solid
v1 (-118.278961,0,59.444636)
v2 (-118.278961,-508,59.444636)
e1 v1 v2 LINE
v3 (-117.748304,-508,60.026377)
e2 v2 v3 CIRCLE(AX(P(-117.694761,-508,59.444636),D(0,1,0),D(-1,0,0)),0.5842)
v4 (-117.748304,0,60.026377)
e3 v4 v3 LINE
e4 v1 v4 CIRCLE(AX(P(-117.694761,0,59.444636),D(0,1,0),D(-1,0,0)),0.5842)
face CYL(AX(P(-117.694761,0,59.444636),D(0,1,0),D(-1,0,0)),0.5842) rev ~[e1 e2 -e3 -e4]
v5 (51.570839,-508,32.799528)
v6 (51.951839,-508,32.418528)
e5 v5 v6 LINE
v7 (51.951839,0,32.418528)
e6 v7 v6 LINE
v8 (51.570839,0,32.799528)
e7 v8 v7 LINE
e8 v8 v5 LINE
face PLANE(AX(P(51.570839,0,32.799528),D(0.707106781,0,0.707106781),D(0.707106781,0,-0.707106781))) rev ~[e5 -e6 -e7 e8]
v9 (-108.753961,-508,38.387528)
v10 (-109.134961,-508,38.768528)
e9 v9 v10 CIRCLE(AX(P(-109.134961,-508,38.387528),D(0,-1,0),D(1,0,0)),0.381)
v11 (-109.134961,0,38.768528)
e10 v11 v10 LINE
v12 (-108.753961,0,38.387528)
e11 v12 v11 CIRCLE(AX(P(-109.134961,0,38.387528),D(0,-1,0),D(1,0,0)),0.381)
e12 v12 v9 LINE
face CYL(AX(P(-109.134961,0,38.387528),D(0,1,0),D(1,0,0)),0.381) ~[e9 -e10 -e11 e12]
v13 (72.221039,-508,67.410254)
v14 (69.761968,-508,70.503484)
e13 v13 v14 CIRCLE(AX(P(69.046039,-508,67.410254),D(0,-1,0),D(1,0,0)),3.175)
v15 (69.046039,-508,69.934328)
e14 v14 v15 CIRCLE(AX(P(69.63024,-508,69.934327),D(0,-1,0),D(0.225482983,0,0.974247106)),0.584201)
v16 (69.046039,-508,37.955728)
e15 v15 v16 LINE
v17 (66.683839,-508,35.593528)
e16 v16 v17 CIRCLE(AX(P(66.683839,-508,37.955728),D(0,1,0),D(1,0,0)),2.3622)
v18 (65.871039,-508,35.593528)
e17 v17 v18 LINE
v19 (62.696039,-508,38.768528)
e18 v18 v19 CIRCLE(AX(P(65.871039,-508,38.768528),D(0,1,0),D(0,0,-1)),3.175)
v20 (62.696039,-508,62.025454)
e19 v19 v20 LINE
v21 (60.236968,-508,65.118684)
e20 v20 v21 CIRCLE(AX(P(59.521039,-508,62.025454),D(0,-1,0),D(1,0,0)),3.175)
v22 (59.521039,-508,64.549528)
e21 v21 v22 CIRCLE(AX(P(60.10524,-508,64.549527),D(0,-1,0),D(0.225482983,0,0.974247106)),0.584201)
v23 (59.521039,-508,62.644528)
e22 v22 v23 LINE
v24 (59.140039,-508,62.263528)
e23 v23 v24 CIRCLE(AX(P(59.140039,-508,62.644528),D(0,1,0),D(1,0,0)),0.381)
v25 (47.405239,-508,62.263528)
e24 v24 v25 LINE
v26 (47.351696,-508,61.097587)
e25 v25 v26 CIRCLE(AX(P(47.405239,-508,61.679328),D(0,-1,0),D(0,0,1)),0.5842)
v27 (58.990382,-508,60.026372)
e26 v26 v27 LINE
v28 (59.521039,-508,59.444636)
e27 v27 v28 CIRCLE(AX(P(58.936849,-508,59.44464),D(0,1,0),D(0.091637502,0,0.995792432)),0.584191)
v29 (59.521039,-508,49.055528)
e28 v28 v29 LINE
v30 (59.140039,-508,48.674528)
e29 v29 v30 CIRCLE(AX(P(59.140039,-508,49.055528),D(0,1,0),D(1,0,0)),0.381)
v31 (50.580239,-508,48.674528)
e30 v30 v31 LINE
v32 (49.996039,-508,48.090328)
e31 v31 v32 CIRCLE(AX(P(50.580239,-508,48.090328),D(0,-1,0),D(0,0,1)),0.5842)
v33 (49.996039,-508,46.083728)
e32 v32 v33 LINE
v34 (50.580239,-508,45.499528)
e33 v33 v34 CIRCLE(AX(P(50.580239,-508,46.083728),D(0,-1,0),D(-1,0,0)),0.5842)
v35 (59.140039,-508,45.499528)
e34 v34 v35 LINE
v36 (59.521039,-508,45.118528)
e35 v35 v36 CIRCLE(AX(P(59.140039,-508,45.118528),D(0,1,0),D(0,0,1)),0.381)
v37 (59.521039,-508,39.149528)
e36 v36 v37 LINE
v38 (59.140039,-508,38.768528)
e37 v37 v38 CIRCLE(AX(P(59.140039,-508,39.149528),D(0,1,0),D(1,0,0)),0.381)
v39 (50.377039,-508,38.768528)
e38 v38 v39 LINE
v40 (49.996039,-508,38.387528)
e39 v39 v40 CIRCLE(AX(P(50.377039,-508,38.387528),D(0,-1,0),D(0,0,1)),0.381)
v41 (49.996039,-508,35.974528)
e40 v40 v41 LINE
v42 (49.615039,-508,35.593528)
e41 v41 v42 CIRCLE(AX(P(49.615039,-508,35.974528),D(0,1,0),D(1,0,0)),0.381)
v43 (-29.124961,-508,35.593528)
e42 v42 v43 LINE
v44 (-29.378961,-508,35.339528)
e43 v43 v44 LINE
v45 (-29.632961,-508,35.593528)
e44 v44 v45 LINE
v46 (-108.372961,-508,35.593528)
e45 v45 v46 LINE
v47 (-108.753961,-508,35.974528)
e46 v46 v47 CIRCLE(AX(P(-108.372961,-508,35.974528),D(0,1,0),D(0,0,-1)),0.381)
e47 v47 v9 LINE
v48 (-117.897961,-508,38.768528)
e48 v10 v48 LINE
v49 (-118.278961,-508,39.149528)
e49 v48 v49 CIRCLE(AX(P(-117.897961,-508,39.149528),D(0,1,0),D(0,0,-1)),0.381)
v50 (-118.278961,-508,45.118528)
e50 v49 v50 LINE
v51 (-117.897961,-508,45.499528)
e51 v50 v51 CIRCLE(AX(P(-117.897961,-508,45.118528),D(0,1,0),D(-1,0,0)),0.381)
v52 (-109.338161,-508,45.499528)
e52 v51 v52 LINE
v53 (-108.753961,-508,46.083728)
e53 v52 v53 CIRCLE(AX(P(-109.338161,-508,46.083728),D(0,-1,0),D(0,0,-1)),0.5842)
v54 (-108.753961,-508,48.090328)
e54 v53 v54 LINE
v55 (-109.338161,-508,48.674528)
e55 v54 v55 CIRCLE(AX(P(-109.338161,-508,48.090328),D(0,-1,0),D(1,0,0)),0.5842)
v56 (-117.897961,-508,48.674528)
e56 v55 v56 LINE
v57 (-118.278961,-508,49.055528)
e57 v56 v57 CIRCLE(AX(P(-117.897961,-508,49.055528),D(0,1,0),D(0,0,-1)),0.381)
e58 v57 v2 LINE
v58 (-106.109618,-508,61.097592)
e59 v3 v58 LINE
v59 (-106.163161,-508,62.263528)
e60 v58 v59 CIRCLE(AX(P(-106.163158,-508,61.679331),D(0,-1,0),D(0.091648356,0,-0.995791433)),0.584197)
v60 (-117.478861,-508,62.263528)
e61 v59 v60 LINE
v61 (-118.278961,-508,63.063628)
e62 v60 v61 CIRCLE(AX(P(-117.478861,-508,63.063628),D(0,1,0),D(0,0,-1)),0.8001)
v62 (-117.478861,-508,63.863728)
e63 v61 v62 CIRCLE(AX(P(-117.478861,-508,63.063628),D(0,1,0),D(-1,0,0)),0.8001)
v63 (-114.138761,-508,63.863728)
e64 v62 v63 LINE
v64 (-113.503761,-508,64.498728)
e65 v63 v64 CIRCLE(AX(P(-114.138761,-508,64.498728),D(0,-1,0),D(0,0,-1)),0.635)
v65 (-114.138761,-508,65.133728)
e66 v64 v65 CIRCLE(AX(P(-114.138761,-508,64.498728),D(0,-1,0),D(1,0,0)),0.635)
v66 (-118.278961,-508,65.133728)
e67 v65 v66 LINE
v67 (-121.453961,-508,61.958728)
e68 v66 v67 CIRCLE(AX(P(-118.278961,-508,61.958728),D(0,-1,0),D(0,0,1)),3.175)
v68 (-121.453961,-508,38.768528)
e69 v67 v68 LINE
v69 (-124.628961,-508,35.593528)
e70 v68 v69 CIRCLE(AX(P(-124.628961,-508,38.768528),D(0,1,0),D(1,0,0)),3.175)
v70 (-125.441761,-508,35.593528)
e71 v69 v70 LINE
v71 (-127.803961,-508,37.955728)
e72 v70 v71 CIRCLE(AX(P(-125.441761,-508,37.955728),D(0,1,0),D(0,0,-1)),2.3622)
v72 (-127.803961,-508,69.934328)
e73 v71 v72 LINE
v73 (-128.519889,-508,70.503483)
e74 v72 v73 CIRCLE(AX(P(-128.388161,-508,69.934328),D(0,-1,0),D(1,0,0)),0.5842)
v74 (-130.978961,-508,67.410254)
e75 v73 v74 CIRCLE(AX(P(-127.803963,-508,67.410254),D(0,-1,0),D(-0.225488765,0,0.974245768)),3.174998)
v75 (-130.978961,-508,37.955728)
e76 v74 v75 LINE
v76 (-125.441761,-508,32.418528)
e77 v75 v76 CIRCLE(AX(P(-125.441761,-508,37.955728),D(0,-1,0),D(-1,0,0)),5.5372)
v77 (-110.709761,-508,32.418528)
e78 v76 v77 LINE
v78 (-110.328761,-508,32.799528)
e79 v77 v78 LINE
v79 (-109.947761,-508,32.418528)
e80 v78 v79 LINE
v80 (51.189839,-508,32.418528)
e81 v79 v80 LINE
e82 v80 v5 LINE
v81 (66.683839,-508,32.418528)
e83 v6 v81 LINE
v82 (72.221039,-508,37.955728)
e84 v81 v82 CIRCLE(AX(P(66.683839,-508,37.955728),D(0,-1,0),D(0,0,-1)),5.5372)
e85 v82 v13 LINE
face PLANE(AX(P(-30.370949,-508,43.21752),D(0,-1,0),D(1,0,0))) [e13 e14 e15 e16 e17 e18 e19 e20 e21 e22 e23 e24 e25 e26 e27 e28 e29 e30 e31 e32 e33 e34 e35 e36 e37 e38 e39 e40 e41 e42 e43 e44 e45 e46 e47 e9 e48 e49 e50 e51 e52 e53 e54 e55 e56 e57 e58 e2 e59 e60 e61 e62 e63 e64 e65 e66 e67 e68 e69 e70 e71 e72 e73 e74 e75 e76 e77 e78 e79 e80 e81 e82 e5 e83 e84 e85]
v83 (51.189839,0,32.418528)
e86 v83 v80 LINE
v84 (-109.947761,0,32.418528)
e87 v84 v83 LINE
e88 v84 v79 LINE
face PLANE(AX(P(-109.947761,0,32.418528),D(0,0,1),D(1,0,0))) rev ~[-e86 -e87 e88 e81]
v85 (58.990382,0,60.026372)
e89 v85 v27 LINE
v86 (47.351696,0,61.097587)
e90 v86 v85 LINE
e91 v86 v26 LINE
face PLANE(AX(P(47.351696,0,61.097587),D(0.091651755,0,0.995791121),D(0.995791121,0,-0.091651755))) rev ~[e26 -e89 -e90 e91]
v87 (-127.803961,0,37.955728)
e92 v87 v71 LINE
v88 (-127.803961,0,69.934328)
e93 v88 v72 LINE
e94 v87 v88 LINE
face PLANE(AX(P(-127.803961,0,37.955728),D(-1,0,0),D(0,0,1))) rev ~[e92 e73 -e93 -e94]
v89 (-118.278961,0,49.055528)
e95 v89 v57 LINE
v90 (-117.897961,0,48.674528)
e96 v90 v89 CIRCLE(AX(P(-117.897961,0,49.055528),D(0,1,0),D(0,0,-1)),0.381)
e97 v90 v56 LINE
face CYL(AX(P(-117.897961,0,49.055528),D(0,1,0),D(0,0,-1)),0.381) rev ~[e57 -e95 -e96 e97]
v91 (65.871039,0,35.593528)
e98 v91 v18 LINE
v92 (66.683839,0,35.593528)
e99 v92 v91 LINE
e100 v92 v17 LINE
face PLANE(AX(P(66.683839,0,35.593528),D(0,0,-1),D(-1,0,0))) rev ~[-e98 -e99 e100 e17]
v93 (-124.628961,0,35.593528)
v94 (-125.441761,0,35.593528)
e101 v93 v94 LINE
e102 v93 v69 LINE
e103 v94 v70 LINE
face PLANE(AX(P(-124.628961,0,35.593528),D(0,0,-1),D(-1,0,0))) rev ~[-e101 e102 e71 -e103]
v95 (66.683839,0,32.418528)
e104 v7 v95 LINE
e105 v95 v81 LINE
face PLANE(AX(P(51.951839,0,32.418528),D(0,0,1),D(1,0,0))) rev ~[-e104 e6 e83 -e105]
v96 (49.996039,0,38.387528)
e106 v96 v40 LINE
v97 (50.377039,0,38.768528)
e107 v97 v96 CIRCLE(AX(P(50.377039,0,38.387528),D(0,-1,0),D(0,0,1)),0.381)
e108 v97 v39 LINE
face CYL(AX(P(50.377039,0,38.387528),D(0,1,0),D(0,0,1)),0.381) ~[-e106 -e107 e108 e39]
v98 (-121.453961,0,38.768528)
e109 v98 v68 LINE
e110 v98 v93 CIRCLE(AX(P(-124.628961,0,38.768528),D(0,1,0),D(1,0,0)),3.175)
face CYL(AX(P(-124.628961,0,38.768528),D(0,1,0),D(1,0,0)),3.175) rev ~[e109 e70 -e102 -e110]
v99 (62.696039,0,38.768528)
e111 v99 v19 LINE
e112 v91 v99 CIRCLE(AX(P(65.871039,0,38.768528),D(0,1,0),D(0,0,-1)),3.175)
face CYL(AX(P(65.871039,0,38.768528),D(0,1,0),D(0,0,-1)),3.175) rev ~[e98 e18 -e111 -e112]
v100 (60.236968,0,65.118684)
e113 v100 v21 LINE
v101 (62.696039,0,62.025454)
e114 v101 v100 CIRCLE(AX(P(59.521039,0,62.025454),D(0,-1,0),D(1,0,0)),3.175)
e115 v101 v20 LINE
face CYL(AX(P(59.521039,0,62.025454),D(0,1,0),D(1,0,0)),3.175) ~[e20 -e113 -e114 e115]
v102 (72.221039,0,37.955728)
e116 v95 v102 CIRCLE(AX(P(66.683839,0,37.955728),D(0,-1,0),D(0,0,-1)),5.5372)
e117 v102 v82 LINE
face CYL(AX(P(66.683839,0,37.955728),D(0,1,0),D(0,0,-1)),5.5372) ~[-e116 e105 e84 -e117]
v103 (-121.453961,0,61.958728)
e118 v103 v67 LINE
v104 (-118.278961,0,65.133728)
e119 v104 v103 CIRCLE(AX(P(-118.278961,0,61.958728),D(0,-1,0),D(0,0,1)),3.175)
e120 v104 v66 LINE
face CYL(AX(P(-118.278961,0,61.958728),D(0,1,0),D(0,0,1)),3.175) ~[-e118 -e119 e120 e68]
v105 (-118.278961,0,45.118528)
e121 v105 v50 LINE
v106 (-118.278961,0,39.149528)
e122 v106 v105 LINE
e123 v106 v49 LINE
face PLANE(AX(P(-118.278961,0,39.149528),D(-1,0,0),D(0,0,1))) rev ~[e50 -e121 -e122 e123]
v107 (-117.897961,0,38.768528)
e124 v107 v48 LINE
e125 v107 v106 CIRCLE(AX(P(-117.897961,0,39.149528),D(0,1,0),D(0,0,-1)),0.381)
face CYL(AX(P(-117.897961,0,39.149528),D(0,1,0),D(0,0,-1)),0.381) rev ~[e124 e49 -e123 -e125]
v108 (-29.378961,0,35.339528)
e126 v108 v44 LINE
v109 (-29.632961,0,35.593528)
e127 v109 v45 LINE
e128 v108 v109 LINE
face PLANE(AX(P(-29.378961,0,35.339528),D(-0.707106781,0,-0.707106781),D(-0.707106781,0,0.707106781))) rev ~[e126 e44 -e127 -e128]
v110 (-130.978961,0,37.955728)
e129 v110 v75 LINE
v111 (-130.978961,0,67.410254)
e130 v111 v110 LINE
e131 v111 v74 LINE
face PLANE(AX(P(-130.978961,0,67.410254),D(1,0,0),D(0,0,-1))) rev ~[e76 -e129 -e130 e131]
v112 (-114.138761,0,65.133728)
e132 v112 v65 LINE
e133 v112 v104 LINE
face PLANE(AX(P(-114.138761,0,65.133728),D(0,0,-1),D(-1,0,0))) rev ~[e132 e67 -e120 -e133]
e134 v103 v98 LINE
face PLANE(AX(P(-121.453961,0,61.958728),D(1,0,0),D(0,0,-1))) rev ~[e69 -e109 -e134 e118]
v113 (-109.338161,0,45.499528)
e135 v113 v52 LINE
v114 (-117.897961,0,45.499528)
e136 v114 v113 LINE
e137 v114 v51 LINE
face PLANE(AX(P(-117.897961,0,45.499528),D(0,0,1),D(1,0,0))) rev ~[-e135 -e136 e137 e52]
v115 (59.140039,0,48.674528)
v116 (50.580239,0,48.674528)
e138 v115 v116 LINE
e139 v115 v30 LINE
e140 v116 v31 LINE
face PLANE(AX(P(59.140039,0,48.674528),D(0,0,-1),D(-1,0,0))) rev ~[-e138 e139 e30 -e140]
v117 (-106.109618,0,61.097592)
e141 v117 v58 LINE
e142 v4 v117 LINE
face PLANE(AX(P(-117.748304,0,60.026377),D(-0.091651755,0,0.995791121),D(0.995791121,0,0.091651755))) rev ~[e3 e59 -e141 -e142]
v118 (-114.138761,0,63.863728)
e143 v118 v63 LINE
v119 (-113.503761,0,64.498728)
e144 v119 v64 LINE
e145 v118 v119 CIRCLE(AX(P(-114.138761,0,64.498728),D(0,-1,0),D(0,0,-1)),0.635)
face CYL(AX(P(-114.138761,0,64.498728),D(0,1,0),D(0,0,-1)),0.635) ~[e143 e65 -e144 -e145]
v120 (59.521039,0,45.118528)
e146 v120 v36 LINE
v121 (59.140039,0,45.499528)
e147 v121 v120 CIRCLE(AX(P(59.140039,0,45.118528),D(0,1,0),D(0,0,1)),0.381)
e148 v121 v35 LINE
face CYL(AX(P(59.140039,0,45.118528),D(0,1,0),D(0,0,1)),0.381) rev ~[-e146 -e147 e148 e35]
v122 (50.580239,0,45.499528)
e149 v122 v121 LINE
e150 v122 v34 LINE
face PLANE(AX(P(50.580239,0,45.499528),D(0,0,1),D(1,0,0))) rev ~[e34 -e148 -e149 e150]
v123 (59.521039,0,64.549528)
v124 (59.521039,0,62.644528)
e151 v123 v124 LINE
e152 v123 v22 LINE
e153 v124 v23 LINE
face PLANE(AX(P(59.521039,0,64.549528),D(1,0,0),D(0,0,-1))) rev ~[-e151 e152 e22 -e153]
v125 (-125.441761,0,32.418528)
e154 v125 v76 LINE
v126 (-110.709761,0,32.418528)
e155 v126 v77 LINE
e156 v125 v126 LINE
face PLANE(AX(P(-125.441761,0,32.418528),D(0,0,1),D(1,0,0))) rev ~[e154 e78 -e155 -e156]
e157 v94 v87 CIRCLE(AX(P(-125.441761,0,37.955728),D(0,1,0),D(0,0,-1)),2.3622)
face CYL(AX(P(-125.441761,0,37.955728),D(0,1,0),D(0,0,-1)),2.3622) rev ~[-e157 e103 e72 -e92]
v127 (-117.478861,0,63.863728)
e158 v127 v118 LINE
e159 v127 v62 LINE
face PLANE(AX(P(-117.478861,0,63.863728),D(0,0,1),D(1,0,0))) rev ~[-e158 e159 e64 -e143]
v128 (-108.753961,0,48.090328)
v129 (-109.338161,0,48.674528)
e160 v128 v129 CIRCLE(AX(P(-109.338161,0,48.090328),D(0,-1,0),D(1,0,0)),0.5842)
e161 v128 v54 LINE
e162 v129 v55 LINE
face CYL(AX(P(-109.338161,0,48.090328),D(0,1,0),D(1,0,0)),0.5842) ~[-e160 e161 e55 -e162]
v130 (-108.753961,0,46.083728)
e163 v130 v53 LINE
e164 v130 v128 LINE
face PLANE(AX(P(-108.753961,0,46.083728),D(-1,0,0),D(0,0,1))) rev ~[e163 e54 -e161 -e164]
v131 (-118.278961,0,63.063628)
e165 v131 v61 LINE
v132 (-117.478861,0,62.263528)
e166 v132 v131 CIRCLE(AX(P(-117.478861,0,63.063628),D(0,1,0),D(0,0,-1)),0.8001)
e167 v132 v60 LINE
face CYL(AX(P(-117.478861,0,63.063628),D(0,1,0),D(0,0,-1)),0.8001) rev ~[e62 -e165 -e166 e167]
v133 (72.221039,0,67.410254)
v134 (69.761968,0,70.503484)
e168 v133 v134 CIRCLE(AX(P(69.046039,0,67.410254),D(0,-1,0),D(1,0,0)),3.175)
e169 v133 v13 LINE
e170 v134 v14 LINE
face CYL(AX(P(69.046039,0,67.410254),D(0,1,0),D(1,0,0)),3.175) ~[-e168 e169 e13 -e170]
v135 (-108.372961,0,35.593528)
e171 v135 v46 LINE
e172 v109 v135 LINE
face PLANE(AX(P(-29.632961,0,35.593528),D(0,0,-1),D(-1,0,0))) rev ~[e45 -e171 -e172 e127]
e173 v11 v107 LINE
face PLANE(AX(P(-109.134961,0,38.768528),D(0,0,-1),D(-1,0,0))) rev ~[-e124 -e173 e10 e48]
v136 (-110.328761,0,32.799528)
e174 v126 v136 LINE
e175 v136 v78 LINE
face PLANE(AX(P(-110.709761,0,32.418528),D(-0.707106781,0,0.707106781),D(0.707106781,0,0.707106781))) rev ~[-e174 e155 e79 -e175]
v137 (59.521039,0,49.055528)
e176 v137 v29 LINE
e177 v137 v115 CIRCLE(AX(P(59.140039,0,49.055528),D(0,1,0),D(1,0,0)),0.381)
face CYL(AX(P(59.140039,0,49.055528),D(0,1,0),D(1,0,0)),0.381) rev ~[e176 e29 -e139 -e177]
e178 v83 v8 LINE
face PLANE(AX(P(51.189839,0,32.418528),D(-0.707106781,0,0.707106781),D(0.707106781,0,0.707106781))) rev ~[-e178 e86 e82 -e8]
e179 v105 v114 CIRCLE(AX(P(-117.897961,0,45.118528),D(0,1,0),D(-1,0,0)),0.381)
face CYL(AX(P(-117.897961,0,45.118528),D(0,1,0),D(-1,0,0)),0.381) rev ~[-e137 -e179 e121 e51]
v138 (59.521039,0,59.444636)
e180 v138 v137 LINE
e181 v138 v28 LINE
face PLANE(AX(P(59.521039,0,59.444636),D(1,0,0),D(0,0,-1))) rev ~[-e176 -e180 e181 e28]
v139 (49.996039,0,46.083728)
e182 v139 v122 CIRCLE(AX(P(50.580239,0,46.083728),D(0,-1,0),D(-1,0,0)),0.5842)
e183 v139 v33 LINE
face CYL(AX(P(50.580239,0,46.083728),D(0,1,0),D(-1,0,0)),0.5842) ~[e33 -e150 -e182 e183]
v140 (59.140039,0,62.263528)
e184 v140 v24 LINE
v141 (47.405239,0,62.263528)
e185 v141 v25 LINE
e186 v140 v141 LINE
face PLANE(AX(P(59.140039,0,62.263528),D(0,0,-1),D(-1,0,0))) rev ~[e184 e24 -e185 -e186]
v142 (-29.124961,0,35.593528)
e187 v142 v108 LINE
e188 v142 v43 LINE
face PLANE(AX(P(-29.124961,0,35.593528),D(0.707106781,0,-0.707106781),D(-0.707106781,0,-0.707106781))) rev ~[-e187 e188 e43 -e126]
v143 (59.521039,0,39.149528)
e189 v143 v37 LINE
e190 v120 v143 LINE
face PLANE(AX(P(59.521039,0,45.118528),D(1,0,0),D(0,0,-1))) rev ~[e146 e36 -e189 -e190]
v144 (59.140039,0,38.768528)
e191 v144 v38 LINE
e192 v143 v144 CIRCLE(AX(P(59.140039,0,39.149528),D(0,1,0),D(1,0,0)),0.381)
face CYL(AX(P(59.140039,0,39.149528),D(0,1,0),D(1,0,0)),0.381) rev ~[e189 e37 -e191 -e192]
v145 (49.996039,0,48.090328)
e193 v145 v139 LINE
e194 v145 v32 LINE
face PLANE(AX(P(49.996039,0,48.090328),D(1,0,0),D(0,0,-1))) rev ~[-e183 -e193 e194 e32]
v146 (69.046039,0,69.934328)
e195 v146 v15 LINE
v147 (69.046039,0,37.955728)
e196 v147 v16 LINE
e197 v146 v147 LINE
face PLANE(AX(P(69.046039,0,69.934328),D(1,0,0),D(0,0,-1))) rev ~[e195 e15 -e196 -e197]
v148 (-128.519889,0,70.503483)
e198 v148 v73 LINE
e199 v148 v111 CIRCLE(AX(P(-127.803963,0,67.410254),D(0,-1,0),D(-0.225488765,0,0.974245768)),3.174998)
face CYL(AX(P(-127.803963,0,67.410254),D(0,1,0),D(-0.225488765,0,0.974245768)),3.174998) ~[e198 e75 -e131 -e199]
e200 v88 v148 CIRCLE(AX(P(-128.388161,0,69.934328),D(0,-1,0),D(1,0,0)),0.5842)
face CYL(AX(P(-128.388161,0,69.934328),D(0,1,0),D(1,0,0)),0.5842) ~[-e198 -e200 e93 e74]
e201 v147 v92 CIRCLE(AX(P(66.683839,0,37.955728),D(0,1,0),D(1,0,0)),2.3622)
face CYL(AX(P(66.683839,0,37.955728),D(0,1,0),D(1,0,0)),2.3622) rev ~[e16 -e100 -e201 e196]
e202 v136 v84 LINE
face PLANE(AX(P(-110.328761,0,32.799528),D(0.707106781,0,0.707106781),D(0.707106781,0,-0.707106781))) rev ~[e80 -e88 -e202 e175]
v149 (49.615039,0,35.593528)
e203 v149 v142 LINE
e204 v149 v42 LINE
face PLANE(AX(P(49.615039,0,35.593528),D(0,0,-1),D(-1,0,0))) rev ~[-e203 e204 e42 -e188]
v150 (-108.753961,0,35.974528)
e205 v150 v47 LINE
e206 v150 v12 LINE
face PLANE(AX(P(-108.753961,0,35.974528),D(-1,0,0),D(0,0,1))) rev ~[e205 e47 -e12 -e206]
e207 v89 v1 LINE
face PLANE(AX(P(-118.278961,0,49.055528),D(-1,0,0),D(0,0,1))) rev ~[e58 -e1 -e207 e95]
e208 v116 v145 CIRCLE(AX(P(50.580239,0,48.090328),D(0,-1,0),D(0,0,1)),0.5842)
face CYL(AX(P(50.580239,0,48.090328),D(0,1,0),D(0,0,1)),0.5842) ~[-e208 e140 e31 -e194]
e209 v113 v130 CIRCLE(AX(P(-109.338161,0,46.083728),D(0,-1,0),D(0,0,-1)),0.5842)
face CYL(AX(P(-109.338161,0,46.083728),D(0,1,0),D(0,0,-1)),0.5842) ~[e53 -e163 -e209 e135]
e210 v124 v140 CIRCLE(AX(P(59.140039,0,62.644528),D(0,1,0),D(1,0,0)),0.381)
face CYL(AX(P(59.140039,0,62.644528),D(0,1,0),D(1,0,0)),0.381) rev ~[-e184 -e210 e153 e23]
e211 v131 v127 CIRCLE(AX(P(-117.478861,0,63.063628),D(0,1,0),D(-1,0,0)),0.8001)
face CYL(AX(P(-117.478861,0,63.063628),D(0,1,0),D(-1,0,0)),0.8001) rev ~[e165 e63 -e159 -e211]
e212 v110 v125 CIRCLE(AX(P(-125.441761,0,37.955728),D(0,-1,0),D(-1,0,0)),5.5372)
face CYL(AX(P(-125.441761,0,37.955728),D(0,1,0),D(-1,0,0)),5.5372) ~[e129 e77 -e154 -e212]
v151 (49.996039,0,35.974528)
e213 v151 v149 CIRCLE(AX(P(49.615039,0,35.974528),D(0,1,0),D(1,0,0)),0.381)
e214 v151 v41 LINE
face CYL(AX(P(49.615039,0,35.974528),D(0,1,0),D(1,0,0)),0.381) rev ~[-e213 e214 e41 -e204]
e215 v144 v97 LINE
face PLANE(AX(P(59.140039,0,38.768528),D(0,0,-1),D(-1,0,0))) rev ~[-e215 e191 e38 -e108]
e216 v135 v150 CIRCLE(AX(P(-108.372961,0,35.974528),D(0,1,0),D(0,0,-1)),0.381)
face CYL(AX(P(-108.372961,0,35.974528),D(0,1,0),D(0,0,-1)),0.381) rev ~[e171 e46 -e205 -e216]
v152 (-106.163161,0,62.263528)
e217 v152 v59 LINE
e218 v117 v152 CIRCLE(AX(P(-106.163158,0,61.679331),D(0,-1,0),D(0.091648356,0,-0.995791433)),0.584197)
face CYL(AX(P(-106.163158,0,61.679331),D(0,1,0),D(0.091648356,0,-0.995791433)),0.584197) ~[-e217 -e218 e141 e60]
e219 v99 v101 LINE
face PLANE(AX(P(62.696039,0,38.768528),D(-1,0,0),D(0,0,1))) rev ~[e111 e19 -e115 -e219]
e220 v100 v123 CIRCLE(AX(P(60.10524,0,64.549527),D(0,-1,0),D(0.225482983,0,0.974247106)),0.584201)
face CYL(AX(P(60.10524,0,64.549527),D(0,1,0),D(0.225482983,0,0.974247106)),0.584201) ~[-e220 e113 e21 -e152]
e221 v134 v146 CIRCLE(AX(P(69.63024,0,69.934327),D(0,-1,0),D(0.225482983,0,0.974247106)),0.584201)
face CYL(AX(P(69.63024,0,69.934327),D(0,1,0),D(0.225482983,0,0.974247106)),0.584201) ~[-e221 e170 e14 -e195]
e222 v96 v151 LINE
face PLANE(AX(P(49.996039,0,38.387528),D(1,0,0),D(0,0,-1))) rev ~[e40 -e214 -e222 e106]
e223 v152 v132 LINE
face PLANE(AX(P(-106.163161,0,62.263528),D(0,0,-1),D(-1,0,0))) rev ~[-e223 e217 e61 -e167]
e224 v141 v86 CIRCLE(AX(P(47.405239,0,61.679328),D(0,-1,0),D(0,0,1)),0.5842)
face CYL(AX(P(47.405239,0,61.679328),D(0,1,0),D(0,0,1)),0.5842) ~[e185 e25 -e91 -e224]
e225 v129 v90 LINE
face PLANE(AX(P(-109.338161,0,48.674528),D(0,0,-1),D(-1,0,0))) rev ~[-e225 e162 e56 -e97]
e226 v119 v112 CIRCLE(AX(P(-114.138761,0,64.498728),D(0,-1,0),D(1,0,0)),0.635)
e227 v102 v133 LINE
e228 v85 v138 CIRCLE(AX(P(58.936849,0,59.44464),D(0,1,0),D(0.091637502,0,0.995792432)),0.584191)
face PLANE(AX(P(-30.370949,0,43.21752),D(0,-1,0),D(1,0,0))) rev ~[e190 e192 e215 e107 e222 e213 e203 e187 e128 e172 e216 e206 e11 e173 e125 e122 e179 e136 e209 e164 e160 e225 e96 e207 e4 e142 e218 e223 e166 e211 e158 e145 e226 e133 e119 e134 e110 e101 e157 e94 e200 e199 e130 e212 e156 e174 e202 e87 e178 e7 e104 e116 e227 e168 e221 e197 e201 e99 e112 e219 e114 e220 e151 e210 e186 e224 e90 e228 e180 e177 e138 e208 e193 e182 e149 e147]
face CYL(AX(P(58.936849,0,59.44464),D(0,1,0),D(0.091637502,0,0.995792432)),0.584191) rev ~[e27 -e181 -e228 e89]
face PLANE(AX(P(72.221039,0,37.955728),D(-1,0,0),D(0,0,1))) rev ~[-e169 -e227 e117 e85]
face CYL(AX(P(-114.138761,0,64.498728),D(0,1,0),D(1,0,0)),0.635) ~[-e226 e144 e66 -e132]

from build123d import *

# Parameters (mm, degrees)
F1_DEPTH = 508


# Not quite as in the source:
# - ends of sketch curves that miss each other by under 0.0002 mm in the source are joined


with BuildPart() as f1:
    # F0 (on Front) → F1 (new body)
    with BuildSketch(Plane.XZ):
        with BuildLine():
            Line((-125.4417608, 32.418528), (-110.7097608, 32.418528))
            Line((-110.7097608, 32.418528), (-110.3287608, 32.799528))
            Line((-110.3287608, 32.799528), (-109.9477608, 32.418528))
            Line((-109.9477608, 32.418528), (51.1898392, 32.418528))
            Line((51.1898392, 32.418528), (51.5708392, 32.799528))
            Line((51.5708392, 32.799528), (51.9518392, 32.418528))
            Line((51.9518392, 32.418528), (66.6838392, 32.418528))
            ThreePointArc((66.6838392, 32.418528), (70.5992308688, 34.0403363312), (72.2210392, 37.955728))
            Line((72.2210392, 37.955728), (72.2210392, 67.4102538))
            ThreePointArc((72.2210392, 67.4102538), (71.5313659528, 69.3860513433), (69.7619677468, 70.5034837164))
            ThreePointArc((69.7619677468, 70.5034837164), (69.2666914482, 70.3916273244), (69.0460392, 69.934328))
            Line((69.0460392, 69.934328), (69.0460392, 37.955728))
            ThreePointArc((69.0460392, 37.955728), (68.3541668385, 36.2854003615), (66.6838392, 35.593528))
            Line((66.6838392, 35.593528), (65.8710392, 35.593528))
            ThreePointArc((65.8710392, 35.593528), (63.6259751697, 36.5234639697), (62.6960392, 38.768528))
            Line((62.6960392, 38.768528), (62.6960392, 62.0254538))
            ThreePointArc((62.6960392, 62.0254538), (62.0063659528, 64.0012513433), (60.2369677468, 65.1186837164))
            ThreePointArc((60.2369677468, 65.1186837164), (59.7416914482, 65.0068273244), (59.5210392, 64.549528))
            Line((59.5210392, 64.549528), (59.5210392, 62.644528))
            ThreePointArc((59.5210392, 62.644528), (59.4094468836, 62.3751203164), (59.1400392, 62.263528))
            Line((59.1400392, 62.263528), (47.4052392, 62.263528))
            ThreePointArc((47.4052392, 62.263528), (46.8216542466, 61.706128041), (47.3516955482, 61.0975868915))
            Line((47.3516955482, 61.0975868915), (58.9903824, 60.0263722))
            ThreePointArc((58.9903824, 60.0263722), (59.3684465687, 59.8383423872), (59.5210392, 59.444636))
            Line((59.5210392, 59.444636), (59.5210392, 49.055528))
            ThreePointArc((59.5210392, 49.055528), (59.4094468836, 48.7861203164), (59.1400392, 48.674528))
            Line((59.1400392, 48.674528), (50.5802392, 48.674528))
            ThreePointArc((50.5802392, 48.674528), (50.1671474184, 48.5034197816), (49.9960392, 48.090328))
            Line((49.9960392, 48.090328), (49.9960392, 46.083728))
            ThreePointArc((49.9960392, 46.083728), (50.1671474184, 45.6706362184), (50.5802392, 45.499528))
            Line((50.5802392, 45.499528), (59.1400392, 45.499528))
            ThreePointArc((59.1400392, 45.499528), (59.4094468836, 45.3879356836), (59.5210392, 45.118528))
            Line((59.5210392, 45.118528), (59.5210392, 39.149528))
            ThreePointArc((59.5210392, 39.149528), (59.4094468836, 38.8801203164), (59.1400392, 38.768528))
            Line((59.1400392, 38.768528), (50.3770392, 38.768528))
            ThreePointArc((50.3770392, 38.768528), (50.1076315164, 38.6569356836), (49.9960392, 38.387528))
            Line((49.9960392, 38.387528), (49.9960392, 35.974528))
            ThreePointArc((49.9960392, 35.974528), (49.8844468836, 35.7051203164), (49.6150392, 35.593528))
            Line((49.6150392, 35.593528), (-29.1249608, 35.593528))
            Line((-29.1249608, 35.593528), (-29.3789608, 35.339528))
            Line((-29.3789608, 35.339528), (-29.6329608, 35.593528))
            Line((-29.6329608, 35.593528), (-108.3729608, 35.593528))
            ThreePointArc((-108.3729608, 35.593528), (-108.6423684836, 35.7051203164), (-108.7539608, 35.974528))
            Line((-108.7539608, 35.974528), (-108.7539608, 38.387528))
            ThreePointArc((-108.7539608, 38.387528), (-108.8655531164, 38.6569356836), (-109.1349608, 38.768528))
            Line((-109.1349608, 38.768528), (-117.8979608, 38.768528))
            ThreePointArc((-117.8979608, 38.768528), (-118.1673684836, 38.8801203164), (-118.2789608, 39.149528))
            Line((-118.2789608, 39.149528), (-118.2789608, 45.118528))
            ThreePointArc((-118.2789608, 45.118528), (-118.1673684836, 45.3879356836), (-117.8979608, 45.499528))
            Line((-117.8979608, 45.499528), (-109.3381608, 45.499528))
            ThreePointArc((-109.3381608, 45.499528), (-108.9250690184, 45.6706362184), (-108.7539608, 46.083728))
            Line((-108.7539608, 46.083728), (-108.7539608, 48.090328))
            ThreePointArc((-108.7539608, 48.090328), (-108.9250690184, 48.5034197816), (-109.3381608, 48.674528))
            Line((-109.3381608, 48.674528), (-117.8979608, 48.674528))
            ThreePointArc((-117.8979608, 48.674528), (-118.1673684836, 48.7861203164), (-118.2789608, 49.055528))
            Line((-118.2789608, 49.055528), (-118.2789608, 59.444636))
            ThreePointArc((-118.2789608, 59.444636), (-118.1263681687, 59.8383423872), (-117.7483044518, 60.0263771085))
            Line((-117.7483044518, 60.0263771085), (-106.1096176, 61.0975918))
            ThreePointArc((-106.1096176, 61.0975918), (-105.5795758466, 61.706128041), (-106.1631608, 62.263528))
            Line((-106.1631608, 62.263528), (-117.4788608, 62.263528))
            ThreePointArc((-117.4788608, 62.263528), (-118.0446169356, 62.4978718644), (-118.2789608, 63.063628))
            ThreePointArc((-118.2789608, 63.063628), (-118.0446169356, 63.6293841356), (-117.4788608, 63.863728))
            Line((-117.4788608, 63.863728), (-114.1387608, 63.863728))
            ThreePointArc((-114.1387608, 63.863728), (-113.6897479939, 64.0497151939), (-113.5037608, 64.498728))
            ThreePointArc((-113.5037608, 64.498728), (-113.6897479939, 64.9477408061), (-114.1387608, 65.133728))
            Line((-114.1387608, 65.133728), (-118.2789608, 65.133728))
            ThreePointArc((-118.2789608, 65.133728), (-120.5240248303, 64.2037920303), (-121.4539608, 61.958728))
            Line((-121.4539608, 61.958728), (-121.4539608, 38.768528))
            ThreePointArc((-121.4539608, 38.768528), (-122.3838967697, 36.5234639697), (-124.6289608, 35.593528))
            Line((-124.6289608, 35.593528), (-125.4417608, 35.593528))
            ThreePointArc((-125.4417608, 35.593528), (-127.1120884385, 36.2854003615), (-127.8039608, 37.955728))
            Line((-127.8039608, 37.955728), (-127.8039608, 69.934328))
            ThreePointArc((-127.8039608, 69.934328), (-128.0246130482, 70.3916273244), (-128.5198891538, 70.503482883))
            ThreePointArc((-128.5198891538, 70.503482883), (-130.2892875528, 69.3860513433), (-130.9789608, 67.4102538))
            Line((-130.9789608, 67.4102538), (-130.9789608, 37.955728))
            ThreePointArc((-130.9789608, 37.955728), (-129.3571524688, 34.0403363312), (-125.4417608, 32.418528))
        make_face()
    extrude(amount=F1_DEPTH)


solid = f1.part
